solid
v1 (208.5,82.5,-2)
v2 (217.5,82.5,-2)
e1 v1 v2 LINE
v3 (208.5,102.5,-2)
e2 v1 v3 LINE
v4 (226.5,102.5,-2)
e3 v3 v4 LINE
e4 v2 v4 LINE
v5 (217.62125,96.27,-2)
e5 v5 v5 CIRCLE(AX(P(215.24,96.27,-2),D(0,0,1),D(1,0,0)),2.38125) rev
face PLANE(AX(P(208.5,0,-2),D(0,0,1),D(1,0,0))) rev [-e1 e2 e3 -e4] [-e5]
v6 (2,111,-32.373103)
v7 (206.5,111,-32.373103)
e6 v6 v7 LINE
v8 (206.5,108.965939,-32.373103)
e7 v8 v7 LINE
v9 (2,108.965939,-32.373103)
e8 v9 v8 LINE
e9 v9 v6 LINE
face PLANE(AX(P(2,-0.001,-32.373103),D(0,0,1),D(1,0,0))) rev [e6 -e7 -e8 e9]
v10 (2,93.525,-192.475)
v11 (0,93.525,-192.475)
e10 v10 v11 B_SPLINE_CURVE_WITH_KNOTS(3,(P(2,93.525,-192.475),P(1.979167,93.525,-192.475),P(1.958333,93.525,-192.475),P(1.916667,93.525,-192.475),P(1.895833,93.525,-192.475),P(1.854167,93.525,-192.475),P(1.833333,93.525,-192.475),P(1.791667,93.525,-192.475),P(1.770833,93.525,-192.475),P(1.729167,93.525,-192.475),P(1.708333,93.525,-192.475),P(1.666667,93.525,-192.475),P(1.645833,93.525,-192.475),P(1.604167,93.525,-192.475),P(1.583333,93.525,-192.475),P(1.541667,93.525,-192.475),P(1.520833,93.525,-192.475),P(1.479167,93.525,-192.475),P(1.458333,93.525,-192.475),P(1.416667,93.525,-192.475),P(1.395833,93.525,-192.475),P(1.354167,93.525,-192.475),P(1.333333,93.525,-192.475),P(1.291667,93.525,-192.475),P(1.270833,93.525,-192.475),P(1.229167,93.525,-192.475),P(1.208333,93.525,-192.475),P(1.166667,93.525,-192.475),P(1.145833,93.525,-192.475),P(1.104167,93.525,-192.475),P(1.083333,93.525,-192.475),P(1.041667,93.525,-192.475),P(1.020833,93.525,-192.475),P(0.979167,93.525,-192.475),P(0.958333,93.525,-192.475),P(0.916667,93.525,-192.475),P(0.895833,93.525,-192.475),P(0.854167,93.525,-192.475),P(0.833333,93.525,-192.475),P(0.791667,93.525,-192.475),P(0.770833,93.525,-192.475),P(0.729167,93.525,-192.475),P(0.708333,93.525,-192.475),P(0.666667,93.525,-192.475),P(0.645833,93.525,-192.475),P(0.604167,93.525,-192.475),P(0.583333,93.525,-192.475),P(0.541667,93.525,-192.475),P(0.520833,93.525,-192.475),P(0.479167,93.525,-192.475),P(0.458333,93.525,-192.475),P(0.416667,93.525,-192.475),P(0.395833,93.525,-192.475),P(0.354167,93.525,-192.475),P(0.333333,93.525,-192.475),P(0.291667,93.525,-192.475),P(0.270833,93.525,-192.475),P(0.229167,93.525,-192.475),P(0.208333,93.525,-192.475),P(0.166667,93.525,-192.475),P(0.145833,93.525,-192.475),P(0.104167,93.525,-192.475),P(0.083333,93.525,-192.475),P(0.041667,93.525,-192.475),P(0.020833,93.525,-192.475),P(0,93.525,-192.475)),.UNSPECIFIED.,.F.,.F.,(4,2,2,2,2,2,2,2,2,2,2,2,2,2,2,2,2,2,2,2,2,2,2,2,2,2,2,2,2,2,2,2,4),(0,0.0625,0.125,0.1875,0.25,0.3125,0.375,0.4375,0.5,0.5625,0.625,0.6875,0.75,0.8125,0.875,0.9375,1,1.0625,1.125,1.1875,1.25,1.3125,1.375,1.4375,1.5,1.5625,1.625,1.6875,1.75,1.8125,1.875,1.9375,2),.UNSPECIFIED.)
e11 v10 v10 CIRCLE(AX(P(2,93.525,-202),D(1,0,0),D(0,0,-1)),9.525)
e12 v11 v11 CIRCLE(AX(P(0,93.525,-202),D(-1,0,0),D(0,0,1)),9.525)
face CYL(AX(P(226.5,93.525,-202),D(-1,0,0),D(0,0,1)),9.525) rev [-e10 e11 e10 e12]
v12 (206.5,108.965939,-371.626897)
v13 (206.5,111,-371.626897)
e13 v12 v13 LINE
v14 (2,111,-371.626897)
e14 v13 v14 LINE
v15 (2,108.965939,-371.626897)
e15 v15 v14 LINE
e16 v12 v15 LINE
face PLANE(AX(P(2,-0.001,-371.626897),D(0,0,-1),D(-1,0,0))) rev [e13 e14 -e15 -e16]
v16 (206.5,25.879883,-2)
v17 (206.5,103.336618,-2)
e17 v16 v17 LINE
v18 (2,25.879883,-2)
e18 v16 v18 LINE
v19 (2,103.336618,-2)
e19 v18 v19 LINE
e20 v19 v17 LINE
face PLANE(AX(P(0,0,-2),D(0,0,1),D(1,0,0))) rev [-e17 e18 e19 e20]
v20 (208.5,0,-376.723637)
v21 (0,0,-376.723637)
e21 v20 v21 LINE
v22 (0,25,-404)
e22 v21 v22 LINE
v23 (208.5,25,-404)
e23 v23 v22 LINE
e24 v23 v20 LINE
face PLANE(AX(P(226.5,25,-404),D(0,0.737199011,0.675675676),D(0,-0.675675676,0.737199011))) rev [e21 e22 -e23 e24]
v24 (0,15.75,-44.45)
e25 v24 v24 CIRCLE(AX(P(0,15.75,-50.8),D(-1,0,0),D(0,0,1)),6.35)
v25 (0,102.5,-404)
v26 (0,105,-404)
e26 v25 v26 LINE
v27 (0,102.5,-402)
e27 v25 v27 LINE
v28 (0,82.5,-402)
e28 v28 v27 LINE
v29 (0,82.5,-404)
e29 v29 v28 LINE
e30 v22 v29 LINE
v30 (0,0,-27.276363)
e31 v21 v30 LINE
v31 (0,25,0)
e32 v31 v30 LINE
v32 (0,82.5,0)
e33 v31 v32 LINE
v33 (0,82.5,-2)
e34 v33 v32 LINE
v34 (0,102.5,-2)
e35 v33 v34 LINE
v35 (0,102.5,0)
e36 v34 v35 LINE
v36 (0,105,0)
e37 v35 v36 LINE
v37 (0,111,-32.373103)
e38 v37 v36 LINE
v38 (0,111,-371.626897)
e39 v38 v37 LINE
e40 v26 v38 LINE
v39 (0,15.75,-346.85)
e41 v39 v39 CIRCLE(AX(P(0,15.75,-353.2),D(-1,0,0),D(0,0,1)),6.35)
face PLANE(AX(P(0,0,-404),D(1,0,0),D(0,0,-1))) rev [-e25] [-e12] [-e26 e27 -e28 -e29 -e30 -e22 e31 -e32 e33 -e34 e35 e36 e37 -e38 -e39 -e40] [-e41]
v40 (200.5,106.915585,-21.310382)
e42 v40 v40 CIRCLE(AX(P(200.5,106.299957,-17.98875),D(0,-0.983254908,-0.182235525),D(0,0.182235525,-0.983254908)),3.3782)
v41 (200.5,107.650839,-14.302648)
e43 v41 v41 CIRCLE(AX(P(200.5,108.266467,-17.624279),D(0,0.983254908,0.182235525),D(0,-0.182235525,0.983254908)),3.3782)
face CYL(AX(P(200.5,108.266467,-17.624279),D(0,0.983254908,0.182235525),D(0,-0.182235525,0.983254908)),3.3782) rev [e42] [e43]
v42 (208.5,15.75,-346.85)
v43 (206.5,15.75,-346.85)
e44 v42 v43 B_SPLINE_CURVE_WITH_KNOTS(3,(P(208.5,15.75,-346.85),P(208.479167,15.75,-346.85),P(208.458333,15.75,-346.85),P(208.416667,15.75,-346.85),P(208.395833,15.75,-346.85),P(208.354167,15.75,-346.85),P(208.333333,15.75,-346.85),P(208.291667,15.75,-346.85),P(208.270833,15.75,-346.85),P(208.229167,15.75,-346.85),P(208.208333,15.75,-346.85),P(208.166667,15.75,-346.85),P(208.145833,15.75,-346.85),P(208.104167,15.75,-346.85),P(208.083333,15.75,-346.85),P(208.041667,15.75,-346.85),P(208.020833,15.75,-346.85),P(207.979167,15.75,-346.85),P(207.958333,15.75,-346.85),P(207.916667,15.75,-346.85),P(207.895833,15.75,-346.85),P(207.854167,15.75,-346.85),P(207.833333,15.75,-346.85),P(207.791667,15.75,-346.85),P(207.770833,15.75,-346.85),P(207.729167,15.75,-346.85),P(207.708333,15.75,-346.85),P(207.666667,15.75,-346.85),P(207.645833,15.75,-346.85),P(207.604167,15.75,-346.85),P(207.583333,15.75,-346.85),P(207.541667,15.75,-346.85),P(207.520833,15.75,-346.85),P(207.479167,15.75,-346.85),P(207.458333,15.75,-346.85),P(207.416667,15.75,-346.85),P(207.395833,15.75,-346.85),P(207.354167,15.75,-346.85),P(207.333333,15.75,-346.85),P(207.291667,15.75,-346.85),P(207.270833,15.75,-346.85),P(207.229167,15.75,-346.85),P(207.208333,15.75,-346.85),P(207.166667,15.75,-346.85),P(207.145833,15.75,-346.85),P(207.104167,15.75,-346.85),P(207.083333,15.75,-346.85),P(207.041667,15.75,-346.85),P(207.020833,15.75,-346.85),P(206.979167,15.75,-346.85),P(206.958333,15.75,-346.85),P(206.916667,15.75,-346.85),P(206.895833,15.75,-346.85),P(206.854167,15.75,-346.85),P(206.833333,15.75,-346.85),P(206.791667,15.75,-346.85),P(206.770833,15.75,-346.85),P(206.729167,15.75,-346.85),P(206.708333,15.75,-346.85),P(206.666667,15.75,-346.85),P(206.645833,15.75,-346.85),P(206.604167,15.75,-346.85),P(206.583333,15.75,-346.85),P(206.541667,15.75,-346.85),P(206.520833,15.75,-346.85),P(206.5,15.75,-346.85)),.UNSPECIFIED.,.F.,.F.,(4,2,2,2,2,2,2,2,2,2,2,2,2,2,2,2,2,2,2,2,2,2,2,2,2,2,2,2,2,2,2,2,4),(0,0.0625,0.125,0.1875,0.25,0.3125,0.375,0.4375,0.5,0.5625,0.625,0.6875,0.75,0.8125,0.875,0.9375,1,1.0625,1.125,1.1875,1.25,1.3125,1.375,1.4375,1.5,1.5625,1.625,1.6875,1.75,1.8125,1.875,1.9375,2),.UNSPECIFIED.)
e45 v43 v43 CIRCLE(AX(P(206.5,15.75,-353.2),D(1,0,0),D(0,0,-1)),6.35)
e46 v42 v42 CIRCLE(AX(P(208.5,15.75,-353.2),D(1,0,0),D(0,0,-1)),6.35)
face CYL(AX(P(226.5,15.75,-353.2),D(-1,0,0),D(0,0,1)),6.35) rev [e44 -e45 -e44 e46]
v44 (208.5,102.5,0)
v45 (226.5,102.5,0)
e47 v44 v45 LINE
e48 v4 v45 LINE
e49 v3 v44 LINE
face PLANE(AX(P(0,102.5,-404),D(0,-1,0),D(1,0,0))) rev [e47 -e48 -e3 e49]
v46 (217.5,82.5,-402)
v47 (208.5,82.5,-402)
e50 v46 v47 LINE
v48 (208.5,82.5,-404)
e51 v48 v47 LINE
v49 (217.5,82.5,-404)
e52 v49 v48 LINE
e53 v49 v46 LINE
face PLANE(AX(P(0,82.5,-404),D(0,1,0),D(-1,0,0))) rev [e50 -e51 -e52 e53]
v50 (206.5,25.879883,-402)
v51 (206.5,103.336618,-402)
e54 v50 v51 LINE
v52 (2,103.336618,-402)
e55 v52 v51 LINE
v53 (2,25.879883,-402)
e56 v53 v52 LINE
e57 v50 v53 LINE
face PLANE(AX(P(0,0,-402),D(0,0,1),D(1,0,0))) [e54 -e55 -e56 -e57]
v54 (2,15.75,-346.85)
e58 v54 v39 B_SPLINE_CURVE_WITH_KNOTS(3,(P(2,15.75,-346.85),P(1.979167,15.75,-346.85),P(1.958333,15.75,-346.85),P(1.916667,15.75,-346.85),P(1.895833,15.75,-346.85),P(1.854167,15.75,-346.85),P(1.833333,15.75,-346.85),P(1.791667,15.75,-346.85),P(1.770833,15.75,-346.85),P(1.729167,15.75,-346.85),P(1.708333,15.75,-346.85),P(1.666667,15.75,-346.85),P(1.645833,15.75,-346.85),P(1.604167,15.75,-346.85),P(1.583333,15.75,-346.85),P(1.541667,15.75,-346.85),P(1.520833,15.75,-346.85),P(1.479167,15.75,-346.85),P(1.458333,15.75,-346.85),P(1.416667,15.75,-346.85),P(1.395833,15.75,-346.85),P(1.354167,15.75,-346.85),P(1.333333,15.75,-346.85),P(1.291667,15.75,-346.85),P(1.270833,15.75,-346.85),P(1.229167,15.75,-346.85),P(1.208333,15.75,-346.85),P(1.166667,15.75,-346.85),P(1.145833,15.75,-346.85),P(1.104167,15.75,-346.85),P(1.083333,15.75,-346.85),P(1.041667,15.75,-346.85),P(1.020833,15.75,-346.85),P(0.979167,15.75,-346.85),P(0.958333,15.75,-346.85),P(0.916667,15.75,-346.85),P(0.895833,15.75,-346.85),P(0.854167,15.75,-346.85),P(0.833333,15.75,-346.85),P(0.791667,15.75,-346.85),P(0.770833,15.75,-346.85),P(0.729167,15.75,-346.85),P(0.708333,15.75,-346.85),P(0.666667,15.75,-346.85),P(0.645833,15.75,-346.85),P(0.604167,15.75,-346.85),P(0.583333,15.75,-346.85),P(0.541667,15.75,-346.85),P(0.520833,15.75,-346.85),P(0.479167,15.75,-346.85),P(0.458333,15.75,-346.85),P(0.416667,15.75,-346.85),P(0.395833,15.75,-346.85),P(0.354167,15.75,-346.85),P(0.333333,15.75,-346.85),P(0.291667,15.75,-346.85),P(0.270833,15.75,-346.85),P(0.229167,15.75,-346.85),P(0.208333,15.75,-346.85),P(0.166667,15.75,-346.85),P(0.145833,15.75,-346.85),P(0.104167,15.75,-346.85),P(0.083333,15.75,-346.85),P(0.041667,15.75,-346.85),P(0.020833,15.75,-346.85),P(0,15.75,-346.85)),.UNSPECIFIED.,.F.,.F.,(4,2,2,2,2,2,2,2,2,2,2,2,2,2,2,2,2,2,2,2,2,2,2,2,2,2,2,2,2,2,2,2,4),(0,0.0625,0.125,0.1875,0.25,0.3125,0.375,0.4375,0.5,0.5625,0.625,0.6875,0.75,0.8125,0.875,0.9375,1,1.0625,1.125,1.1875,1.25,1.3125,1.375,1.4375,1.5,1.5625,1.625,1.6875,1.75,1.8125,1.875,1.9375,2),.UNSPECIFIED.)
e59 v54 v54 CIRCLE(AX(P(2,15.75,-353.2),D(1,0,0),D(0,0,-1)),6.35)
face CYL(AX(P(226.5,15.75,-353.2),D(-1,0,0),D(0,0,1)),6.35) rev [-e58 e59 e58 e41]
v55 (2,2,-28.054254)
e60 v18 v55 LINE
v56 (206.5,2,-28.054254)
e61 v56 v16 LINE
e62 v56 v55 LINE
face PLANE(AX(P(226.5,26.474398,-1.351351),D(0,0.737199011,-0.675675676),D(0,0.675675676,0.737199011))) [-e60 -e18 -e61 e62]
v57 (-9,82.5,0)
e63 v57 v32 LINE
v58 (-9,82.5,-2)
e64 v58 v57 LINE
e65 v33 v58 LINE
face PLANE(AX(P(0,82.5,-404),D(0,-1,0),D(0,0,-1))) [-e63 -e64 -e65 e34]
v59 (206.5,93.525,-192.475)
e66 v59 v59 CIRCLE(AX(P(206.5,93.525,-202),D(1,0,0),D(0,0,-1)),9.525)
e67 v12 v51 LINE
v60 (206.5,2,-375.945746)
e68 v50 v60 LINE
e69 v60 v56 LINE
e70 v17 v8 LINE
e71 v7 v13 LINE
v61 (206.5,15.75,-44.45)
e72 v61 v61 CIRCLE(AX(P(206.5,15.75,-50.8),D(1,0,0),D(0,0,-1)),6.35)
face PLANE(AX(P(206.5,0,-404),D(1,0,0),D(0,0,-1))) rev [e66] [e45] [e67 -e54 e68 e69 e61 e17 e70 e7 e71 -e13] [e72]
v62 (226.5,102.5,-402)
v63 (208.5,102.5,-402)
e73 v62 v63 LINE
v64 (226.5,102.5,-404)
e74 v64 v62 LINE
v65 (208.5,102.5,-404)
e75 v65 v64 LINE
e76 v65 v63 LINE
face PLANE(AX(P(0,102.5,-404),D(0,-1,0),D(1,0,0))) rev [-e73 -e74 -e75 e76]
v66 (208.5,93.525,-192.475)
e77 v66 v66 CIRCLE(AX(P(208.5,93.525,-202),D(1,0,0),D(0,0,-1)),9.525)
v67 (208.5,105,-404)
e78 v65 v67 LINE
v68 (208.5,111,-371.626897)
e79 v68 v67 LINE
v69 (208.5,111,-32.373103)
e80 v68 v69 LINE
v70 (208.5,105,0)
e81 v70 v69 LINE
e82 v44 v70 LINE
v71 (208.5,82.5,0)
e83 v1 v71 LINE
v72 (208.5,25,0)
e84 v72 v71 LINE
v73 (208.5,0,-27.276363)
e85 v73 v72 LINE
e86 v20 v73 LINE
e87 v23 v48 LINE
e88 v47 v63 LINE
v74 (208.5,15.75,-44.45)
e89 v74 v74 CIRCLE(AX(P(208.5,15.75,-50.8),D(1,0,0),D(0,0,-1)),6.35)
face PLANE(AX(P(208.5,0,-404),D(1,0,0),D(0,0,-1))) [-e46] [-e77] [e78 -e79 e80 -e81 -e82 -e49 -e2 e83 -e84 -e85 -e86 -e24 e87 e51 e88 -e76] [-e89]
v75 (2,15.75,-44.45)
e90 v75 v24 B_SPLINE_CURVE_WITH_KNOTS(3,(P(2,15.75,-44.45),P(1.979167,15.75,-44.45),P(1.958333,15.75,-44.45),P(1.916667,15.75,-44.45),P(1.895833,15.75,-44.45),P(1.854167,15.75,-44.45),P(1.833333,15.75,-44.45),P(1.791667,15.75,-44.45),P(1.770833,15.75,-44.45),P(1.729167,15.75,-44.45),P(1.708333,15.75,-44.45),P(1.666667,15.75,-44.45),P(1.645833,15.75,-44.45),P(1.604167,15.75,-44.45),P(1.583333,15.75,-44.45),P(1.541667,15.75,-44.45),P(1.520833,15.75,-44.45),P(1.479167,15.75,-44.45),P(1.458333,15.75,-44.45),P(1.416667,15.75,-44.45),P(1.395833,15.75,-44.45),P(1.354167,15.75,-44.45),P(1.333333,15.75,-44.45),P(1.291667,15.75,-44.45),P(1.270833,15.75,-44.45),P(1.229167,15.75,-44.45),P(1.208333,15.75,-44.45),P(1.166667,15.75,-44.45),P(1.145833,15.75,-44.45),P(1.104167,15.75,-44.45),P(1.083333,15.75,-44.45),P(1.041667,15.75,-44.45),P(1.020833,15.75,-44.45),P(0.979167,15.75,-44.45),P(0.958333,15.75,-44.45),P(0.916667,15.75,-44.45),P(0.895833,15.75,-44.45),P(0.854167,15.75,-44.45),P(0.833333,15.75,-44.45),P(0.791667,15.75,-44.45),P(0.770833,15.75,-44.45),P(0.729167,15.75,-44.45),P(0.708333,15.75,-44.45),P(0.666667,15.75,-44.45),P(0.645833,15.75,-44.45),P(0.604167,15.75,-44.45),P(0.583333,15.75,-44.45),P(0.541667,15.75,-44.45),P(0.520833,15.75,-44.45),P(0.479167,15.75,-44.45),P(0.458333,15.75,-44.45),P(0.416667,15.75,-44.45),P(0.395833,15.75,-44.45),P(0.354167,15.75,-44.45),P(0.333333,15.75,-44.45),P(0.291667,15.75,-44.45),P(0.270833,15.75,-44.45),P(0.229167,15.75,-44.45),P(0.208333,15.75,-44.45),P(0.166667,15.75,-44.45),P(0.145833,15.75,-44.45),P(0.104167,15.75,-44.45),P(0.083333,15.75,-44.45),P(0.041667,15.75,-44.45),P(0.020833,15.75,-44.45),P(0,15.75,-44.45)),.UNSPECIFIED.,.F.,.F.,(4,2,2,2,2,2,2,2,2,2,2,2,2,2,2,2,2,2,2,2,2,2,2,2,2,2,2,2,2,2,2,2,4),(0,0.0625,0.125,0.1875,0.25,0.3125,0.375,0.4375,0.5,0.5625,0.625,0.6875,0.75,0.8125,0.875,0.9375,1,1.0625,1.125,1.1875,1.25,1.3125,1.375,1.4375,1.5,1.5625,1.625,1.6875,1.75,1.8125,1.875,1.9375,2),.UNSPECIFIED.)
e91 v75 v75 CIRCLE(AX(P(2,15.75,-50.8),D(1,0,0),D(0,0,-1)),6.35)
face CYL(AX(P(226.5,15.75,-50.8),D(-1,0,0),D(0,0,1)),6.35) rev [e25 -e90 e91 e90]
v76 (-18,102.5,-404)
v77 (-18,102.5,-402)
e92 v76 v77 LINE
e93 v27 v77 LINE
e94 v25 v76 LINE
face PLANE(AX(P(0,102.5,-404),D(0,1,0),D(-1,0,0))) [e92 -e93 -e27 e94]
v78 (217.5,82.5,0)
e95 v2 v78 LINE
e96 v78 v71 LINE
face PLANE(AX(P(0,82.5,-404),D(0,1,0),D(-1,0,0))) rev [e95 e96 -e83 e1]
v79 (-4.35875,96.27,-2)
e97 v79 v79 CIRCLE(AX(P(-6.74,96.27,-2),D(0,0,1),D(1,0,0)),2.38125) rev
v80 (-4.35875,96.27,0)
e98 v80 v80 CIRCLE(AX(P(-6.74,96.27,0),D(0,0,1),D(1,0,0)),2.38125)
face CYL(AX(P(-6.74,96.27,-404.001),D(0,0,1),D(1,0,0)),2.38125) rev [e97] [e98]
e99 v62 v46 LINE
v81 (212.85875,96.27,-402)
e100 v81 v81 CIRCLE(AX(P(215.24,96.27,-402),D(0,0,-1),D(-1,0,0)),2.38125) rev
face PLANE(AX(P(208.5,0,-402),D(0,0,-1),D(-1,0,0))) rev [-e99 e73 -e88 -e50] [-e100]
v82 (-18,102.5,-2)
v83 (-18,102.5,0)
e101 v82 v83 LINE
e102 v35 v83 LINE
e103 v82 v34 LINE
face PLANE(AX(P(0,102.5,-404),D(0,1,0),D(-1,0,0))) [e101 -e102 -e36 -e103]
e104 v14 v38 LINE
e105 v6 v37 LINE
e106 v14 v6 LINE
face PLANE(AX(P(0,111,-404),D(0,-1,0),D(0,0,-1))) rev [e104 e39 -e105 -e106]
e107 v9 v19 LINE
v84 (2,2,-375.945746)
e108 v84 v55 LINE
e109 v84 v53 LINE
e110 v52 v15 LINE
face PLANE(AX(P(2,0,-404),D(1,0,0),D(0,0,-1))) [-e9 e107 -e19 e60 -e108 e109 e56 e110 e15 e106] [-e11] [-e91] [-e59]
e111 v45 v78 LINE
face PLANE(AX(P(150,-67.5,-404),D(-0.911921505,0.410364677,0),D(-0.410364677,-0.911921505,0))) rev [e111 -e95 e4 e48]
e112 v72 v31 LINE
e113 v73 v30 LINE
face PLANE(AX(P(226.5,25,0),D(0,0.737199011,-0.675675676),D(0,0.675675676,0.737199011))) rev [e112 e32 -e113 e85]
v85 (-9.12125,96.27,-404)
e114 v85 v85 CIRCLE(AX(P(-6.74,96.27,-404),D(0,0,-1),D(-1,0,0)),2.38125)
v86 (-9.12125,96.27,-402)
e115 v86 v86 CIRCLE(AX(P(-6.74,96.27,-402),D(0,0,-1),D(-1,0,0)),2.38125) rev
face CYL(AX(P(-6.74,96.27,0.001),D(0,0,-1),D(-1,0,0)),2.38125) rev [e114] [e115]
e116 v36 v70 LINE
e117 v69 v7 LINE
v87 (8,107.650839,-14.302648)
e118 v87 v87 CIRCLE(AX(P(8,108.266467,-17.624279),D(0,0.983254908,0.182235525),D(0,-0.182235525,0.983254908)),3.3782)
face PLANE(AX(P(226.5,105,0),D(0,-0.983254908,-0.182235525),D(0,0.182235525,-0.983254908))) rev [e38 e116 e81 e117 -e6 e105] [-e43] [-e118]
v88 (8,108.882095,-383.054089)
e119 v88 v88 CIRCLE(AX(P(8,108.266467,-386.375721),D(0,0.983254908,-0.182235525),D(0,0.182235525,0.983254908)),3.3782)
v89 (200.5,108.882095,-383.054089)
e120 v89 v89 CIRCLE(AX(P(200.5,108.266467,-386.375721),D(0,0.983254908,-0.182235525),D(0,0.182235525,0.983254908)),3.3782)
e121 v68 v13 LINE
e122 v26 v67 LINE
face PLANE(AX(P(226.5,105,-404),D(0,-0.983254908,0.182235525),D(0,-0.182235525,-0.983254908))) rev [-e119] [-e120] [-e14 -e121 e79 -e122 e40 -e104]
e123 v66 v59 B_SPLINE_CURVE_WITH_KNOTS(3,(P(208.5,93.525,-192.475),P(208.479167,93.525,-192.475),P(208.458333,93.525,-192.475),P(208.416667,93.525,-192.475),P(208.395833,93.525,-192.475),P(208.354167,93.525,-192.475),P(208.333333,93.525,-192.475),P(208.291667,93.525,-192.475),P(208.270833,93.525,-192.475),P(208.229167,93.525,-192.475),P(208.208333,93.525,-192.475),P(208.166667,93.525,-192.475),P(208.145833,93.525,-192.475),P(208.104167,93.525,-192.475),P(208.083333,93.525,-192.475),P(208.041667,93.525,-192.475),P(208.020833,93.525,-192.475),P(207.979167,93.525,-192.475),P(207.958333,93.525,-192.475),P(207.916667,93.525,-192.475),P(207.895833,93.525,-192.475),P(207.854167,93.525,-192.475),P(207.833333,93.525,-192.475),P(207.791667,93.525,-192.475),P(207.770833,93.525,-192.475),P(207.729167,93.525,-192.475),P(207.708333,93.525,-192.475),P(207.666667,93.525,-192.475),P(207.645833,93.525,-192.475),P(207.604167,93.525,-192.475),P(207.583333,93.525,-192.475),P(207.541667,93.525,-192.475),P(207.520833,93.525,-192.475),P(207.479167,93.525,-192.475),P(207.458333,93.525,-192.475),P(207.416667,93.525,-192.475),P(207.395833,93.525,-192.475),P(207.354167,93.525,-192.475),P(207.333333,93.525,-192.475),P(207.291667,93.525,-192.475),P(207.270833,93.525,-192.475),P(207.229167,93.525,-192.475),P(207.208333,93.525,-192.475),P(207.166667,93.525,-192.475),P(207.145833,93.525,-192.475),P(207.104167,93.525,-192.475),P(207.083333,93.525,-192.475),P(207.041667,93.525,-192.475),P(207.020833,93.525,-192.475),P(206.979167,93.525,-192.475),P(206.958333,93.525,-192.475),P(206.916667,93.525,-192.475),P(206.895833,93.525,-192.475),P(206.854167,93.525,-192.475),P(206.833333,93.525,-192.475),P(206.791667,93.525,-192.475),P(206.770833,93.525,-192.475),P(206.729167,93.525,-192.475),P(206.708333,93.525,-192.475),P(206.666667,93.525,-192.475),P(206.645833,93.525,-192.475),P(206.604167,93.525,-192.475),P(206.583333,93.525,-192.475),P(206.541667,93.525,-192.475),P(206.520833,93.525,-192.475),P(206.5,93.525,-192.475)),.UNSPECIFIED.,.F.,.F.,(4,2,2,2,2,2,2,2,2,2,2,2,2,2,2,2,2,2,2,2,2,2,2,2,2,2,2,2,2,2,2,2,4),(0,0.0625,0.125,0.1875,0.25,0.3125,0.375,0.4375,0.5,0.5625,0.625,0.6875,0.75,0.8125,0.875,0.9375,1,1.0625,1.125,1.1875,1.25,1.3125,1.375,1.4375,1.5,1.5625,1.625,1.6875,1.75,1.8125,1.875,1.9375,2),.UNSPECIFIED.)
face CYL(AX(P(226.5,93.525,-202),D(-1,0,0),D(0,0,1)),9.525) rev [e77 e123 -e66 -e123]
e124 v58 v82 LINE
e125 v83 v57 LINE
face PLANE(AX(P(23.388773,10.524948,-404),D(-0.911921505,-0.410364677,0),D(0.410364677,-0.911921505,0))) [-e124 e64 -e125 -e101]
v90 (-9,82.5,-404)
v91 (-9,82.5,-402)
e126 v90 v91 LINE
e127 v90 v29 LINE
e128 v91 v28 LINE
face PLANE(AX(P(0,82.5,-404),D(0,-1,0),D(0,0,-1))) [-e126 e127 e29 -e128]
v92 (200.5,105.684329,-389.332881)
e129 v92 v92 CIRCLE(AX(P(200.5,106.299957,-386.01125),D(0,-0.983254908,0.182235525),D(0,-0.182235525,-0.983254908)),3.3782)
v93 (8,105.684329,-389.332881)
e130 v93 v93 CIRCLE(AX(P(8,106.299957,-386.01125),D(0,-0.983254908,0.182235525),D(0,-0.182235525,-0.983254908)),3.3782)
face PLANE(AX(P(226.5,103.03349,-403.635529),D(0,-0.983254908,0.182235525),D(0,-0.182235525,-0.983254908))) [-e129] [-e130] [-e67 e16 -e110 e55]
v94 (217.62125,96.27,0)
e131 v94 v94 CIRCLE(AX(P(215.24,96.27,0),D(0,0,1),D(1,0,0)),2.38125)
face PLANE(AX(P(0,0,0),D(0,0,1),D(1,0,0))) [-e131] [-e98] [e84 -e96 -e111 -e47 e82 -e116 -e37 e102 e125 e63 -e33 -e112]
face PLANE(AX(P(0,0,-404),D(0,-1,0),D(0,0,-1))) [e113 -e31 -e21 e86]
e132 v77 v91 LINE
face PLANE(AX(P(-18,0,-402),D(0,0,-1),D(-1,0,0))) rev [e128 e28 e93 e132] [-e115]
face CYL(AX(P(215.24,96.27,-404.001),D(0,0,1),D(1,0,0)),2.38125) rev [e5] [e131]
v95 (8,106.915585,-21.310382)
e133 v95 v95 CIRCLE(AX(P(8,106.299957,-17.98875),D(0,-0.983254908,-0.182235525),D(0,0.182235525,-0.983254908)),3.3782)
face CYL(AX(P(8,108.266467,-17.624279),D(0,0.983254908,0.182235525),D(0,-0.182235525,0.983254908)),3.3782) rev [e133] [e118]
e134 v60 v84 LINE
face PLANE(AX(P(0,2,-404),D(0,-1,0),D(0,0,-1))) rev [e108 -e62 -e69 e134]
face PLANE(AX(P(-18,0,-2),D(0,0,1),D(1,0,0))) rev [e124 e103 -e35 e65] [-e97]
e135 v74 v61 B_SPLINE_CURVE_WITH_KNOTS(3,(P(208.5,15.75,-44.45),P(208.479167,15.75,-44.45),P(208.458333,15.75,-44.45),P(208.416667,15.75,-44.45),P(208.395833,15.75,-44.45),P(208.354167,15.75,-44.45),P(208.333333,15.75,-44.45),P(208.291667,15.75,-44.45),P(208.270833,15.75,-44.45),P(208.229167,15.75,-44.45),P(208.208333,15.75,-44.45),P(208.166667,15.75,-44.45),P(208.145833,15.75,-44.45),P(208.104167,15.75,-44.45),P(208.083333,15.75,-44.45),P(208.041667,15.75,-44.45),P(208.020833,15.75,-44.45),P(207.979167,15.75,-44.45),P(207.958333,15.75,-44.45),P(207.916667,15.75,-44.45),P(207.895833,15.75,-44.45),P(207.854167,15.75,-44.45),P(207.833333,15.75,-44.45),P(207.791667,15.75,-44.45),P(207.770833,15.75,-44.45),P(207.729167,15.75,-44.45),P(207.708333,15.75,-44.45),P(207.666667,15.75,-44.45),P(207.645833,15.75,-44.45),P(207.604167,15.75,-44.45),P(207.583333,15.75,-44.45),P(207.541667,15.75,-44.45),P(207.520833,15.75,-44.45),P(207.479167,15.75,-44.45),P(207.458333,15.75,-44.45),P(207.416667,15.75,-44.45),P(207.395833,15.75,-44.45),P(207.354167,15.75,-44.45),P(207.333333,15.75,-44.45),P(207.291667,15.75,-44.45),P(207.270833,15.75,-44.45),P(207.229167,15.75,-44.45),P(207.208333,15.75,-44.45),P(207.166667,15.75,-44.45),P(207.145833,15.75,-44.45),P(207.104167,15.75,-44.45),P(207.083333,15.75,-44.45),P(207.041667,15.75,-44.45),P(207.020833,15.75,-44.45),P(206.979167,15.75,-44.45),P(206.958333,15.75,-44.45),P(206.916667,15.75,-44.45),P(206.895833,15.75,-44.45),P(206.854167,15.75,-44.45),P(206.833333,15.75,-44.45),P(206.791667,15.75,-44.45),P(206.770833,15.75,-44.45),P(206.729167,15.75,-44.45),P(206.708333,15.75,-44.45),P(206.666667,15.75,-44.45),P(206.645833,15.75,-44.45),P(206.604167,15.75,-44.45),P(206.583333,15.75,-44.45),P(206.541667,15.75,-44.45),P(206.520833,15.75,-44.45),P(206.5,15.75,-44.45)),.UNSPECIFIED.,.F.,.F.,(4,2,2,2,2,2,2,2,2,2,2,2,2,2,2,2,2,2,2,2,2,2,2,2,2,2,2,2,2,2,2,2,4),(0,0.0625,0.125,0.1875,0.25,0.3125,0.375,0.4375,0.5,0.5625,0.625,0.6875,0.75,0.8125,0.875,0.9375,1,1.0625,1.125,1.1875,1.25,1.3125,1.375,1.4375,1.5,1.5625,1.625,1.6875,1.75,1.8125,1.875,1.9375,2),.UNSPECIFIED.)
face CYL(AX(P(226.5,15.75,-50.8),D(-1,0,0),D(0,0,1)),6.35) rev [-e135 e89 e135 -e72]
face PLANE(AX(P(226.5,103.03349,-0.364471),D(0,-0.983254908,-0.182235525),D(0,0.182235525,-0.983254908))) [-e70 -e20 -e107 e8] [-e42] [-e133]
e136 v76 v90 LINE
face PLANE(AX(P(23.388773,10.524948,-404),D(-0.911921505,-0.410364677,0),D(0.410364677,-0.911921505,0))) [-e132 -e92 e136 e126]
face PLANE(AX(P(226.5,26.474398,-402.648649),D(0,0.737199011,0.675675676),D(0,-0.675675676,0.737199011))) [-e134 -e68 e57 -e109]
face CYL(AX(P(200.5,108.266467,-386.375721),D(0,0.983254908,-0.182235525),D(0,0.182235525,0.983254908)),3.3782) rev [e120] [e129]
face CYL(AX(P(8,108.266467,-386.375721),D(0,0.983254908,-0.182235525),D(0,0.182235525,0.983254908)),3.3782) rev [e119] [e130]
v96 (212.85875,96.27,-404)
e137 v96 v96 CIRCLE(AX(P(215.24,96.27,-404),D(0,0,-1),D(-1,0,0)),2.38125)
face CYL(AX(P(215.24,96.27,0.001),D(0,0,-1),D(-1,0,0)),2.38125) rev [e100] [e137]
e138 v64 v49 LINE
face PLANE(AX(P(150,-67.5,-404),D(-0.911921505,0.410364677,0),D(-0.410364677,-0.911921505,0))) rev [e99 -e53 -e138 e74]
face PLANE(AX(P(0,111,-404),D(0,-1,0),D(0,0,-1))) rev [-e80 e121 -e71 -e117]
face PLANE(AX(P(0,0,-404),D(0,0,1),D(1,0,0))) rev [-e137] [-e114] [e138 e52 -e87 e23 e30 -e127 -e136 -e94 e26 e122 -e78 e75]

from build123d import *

# Parameters (mm, degrees)
ESQUISSE1_W             = 208.5
ESQUISSE1_H             = 111
BOSS_EXTRU_1_DEPTH      = 404
ESQUISSE3_W             = 18
ESQUISSE3_H             = 400
ENL_V_MAT_EXTRU_2_DEPTH = 475.36747359
ENL_V_MAT_EXTRU_3_DEPTH = 477.276442835
COQUE2_START            = 2
COQUE2_DEPTH            = 204.5
ENL_V_MAT_EXTRU_4_REACH = 478.276
ESQUISSE5_W             = 204.5
ESQUISSE5_H             = 339.253793908
D_GAGEMENT_1_41_D       = 6.7564
D_GAGEMENT_1_41_DEPTH   = 2
D_GAGEMENT_1_42_D       = 6.7564
D_GAGEMENT_1_42_DEPTH   = 2
ESQUISSE10_R            = 9.525
ESQUISSE10_R_2          = 6.35
ENL_V_MAT_EXTRU_5_DEPTH = 477.276442835
ENL_V_MAT_EXTRU_6_REACH = 478.276
ESQUISSE11_R            = 2.38125
ENL_V_MAT_EXTRU_7_REACH = 478.276
ESQUISSE12_R            = 2.38125


# Read off the part's stored shape, not the designer's step: Coque2
with BuildPart() as part:
    # Esquisse1 → Boss.-Extru.1 (new body)
    with BuildSketch(Plane.XY):
        with Locations((104.25, 55.5)):
            Rectangle(ESQUISSE1_W, ESQUISSE1_H)
        Polygon((0, 102.5), (-18, 102.5), (-9, 82.5), (0, 82.5), align=None)
        Polygon((208.5, 102.5), (226.5, 102.5), (217.5, 82.5), (208.5, 82.5), align=None)
    extrude(amount=-BOSS_EXTRU_1_DEPTH)

    # Esquisse3 → Enlèv. mat.-Extru.2 (cut, through all)
    with BuildSketch(Plane(origin=(0, 102.5, 0), x_dir=(1, 0, 0), z_dir=(0, 1, 0))):
        with Locations((-9, 202)):
            Rectangle(ESQUISSE3_W, ESQUISSE3_H)
        with Locations((217.5, 202)):
            Rectangle(ESQUISSE3_W, ESQUISSE3_H)
    extrude(amount=-ENL_V_MAT_EXTRU_2_DEPTH, mode=Mode.SUBTRACT)

    # Esquisse4 → Enlèv. mat.-Extru.3 (cut, through all)
    with BuildSketch(Plane.ZY):
        Polygon((0, 105), (-32.373103046, 111), (0, 111), align=None)
        Polygon((-404, 105), (-371.626896954, 111), (-404, 111), align=None)
        Polygon((0, 25), (-27.276363394, 0), (0, 0), align=None)
        Polygon((-404, 25), (-376.723636606, 0), (-404, 0), align=None)
    extrude(amount=-ENL_V_MAT_EXTRU_3_DEPTH, mode=Mode.SUBTRACT)

    # Coque2 outline → Coque2 (cut)
    with BuildSketch(Plane.YZ.offset(COQUE2_START)):
        Polygon((25.87988269, -402), (103.336617558, -402), (109, -371.443122771), (109, -32.556877229), (103.336617558, -2), (25.87988269, -2), (2, -28.054254322), (2, -375.945745678), align=None)
    extrude(amount=COQUE2_DEPTH, mode=Mode.SUBTRACT)

    # Esquisse5 → Enlèv. mat.-Extru.4 (cut, up to next)
    with BuildSketch(Plane(origin=(0, 111, 0), x_dir=(1, 0, 0), z_dir=(0, 1, 0)), mode=Mode.PRIVATE) as enl_v_mat_extru_4_sk1:
        with Locations((104.25, 202)):
            Rectangle(ESQUISSE5_W, ESQUISSE5_H)
    enl_v_mat_extru_4_tool1 = extrude(enl_v_mat_extru_4_sk1.sketch, amount=-ENL_V_MAT_EXTRU_4_REACH, mode=Mode.PRIVATE) & part.part
    add(enl_v_mat_extru_4_tool1.solids().sort_by_distance((104.25, 111, -202))[0], mode=Mode.SUBTRACT)

    # Dégagement 1/41
    with Locations(Plane(origin=(0, 101.512972391, 18.814317351), x_dir=(1, 0, 0), z_dir=(0, 0.983254907563956, 0.18223552549214056))):
        with Locations((8, 37.059155773), (200.5, 37.059155773)):
            Hole(D_GAGEMENT_1_41_D / 2, depth=D_GAGEMENT_1_41_DEPTH)

    # Dégagement 1/42
    with Locations(Plane(origin=(0, 173.903298199, -32.231071199), x_dir=(1, 0, 0), z_dir=(0, 0.983254907563956, -0.18223552549214078))):
        with Locations((8, 360.175826883), (200.5, 360.175826883)):
            Hole(D_GAGEMENT_1_42_D / 2, depth=D_GAGEMENT_1_42_DEPTH)

    # Esquisse10 → Enlèv. mat.-Extru.5 (cut, through all)
    with BuildSketch(Plane.ZY):
        with Locations((-202, 93.525)):
            Circle(ESQUISSE10_R)
        with Locations((-353.2, 15.75)):
            Circle(ESQUISSE10_R_2)
        with Locations((-50.8, 15.75)):
            Circle(ESQUISSE10_R_2)
    extrude(amount=-ENL_V_MAT_EXTRU_5_DEPTH, mode=Mode.SUBTRACT)

    # Esquisse11 → Enlèv. mat.-Extru.6 (cut, up to next)
    with BuildSketch(Plane.XY, mode=Mode.PRIVATE) as enl_v_mat_extru_6_sk1:
        with Locations((-6.74, 96.27)):
            Circle(ESQUISSE11_R)
    enl_v_mat_extru_6_tool1 = extrude(enl_v_mat_extru_6_sk1.sketch, amount=-ENL_V_MAT_EXTRU_6_REACH, mode=Mode.PRIVATE) & part.part
    # Esquisse11 → Enlèv. mat.-Extru.6 (cut, up to next)
    with BuildSketch(Plane.XY, mode=Mode.PRIVATE) as enl_v_mat_extru_6_sk2:
        with Locations((215.24, 96.27)):
            Circle(ESQUISSE11_R)
    enl_v_mat_extru_6_tool2 = extrude(enl_v_mat_extru_6_sk2.sketch, amount=-ENL_V_MAT_EXTRU_6_REACH, mode=Mode.PRIVATE) & part.part
    add(enl_v_mat_extru_6_tool1.solids().sort_by_distance((-6.74, 96.27, 0))[0], mode=Mode.SUBTRACT)
    add(enl_v_mat_extru_6_tool2.solids().sort_by_distance((215.24, 96.27, 0))[0], mode=Mode.SUBTRACT)

    # Esquisse12 → Enlèv. mat.-Extru.7 (cut, up to next)
    with BuildSketch(Plane(origin=(0, 0, -404), x_dir=(-1, 0, 0), z_dir=(0, 0, -1)), mode=Mode.PRIVATE) as enl_v_mat_extru_7_sk1:
        with Locations(Location((-215.24, 96.27, 0), (0, 0, 180))):
            Circle(ESQUISSE12_R)
    enl_v_mat_extru_7_tool1 = extrude(enl_v_mat_extru_7_sk1.sketch, amount=-ENL_V_MAT_EXTRU_7_REACH, mode=Mode.PRIVATE) & part.part
    # Esquisse12 → Enlèv. mat.-Extru.7 (cut, up to next)
    with BuildSketch(Plane(origin=(0, 0, -404), x_dir=(-1, 0, 0), z_dir=(0, 0, -1)), mode=Mode.PRIVATE) as enl_v_mat_extru_7_sk2:
        with Locations(Location((6.74, 96.27, 0), (0, 0, 180))):
            Circle(ESQUISSE12_R)
    enl_v_mat_extru_7_tool2 = extrude(enl_v_mat_extru_7_sk2.sketch, amount=-ENL_V_MAT_EXTRU_7_REACH, mode=Mode.PRIVATE) & part.part
    add(enl_v_mat_extru_7_tool1.solids().sort_by_distance((215.24, 96.27, -404))[0], mode=Mode.SUBTRACT)
    add(enl_v_mat_extru_7_tool2.solids().sort_by_distance((-6.74, 96.27, -404))[0], mode=Mode.SUBTRACT)


solid = part.part
